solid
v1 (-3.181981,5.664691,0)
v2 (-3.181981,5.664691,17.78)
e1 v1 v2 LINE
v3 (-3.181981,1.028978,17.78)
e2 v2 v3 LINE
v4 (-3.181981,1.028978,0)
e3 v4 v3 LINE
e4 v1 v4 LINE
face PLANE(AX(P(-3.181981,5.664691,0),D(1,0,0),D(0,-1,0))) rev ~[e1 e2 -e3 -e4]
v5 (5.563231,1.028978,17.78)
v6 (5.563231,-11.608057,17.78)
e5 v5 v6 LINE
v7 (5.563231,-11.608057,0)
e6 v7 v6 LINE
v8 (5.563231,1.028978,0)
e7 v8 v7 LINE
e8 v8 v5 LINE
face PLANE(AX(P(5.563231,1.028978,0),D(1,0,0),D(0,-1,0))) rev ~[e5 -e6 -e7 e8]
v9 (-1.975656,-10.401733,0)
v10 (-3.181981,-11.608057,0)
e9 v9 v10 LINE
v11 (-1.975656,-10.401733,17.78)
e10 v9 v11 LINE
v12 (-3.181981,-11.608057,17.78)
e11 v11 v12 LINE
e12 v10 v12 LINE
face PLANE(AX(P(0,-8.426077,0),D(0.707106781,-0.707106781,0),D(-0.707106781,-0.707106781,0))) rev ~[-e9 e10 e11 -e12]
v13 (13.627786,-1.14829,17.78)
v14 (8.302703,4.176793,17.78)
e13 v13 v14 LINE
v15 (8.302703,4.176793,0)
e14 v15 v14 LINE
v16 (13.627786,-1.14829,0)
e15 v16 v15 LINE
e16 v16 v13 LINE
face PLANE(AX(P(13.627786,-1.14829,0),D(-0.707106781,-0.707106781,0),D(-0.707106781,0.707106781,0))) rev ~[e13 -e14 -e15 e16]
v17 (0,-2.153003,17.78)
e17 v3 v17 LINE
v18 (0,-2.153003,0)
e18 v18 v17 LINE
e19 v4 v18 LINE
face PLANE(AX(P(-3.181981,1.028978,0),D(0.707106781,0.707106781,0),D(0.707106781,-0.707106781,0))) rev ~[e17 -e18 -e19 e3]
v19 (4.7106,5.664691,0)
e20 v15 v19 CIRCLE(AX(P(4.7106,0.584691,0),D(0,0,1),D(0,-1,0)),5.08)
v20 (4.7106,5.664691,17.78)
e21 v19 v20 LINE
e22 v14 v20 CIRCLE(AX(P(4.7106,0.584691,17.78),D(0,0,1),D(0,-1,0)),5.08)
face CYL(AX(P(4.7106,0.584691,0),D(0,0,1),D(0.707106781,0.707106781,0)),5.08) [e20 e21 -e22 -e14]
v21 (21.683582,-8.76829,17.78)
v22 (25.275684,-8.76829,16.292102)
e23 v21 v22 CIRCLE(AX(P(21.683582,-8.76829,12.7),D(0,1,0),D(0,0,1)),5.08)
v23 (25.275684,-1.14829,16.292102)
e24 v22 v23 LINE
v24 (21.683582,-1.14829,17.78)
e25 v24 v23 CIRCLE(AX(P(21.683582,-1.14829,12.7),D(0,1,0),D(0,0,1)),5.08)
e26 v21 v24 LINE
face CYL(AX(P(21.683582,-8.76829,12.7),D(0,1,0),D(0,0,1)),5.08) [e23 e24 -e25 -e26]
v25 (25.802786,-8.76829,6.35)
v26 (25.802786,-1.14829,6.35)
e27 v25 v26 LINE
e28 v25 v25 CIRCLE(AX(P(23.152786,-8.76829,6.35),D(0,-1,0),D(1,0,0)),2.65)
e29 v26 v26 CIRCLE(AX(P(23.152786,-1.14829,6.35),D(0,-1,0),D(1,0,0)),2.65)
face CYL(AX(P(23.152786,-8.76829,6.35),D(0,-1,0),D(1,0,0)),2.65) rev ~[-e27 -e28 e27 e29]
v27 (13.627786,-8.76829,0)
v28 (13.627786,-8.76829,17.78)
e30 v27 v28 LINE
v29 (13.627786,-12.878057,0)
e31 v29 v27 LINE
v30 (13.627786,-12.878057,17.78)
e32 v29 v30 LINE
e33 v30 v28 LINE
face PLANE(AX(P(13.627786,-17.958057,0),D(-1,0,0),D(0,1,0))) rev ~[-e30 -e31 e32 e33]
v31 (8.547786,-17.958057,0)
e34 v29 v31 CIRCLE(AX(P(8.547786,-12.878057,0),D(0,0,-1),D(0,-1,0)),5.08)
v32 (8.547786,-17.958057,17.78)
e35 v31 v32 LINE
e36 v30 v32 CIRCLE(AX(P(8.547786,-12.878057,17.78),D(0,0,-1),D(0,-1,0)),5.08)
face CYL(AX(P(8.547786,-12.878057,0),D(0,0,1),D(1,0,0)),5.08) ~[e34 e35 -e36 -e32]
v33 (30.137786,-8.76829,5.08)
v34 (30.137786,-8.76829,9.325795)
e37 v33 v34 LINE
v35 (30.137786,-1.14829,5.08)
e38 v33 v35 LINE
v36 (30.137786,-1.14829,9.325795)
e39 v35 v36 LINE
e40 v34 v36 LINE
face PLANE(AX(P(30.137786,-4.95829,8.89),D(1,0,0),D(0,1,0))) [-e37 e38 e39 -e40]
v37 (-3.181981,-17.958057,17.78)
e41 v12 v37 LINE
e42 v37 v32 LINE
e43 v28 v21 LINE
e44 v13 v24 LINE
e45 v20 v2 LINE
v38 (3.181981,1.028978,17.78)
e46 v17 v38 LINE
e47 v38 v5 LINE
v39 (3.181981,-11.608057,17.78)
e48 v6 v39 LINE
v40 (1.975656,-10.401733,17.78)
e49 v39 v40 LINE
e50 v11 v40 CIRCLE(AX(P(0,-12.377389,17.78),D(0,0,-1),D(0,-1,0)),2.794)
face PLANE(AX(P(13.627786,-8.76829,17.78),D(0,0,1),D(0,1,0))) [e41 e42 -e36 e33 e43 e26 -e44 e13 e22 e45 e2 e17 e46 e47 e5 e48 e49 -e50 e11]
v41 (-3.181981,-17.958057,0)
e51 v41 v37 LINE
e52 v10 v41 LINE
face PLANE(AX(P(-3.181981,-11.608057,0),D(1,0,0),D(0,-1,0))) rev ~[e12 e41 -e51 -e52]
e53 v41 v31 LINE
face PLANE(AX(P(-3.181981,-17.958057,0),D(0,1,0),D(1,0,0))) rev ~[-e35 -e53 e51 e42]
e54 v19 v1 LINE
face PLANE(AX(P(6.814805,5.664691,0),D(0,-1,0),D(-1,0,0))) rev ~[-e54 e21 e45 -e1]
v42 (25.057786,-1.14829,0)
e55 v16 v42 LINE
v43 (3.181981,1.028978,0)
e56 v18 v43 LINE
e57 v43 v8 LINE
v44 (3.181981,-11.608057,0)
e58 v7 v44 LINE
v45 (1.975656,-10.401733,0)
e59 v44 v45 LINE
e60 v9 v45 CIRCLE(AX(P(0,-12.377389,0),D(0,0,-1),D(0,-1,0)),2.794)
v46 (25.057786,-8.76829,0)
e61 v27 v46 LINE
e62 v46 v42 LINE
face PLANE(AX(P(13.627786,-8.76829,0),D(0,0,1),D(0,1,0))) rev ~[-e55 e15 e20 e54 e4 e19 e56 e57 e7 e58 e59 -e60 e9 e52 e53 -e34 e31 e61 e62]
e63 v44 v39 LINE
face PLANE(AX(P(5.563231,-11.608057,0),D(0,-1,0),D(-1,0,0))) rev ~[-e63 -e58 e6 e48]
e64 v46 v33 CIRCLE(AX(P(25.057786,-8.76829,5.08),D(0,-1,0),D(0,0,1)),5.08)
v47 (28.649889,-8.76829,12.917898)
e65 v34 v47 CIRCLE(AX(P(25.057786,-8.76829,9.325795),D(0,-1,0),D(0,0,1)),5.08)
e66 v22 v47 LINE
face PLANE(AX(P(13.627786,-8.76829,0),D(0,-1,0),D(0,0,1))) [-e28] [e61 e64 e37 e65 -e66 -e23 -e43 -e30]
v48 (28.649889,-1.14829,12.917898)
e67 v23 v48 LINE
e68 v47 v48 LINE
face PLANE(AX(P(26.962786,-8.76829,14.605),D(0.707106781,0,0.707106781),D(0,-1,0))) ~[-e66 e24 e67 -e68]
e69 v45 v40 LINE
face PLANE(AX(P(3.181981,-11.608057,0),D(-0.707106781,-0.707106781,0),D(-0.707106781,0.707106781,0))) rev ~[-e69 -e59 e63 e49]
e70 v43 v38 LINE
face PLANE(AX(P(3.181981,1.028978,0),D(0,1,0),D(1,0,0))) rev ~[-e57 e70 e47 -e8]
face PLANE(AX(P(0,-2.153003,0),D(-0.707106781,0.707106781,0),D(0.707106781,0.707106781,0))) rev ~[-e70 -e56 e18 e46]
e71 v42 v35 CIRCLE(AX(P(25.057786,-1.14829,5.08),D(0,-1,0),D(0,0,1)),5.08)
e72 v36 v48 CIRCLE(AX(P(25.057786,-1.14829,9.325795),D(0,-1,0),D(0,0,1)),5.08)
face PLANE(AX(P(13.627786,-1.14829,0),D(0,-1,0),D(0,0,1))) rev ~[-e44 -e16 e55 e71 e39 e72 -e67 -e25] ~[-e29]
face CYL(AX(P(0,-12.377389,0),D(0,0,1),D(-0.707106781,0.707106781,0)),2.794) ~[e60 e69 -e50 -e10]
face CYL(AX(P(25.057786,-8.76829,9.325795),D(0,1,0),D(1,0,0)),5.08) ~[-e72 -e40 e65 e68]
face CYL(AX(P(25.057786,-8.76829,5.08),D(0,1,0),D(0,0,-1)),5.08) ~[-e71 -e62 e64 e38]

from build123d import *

# Parameters (mm, degrees)
F1_DEPTH = 17.78
F2_W     = 7.62
F2_H     = 17.78
F3_DEPTH = 16.51
F4_SIZE  = 6.35
F5_R     = 2.65
F6_DEPTH = 25.4
F7_R     = 2.794
F8_R     = 5.08
F9_R     = 5.08
F10_R    = 5.08
F11_R    = 5.08


# Not quite as in the source:
# - a feature names something its author has since deleted; it is built from what else it names


with BuildPart() as f1:
    # F0 (on Top) → F1 (new body)
    with BuildSketch(Plane.XY):
        Polygon((5.5632305153, 1.0289779667), (5.5632305153, -11.6080572072), (3.1819805153, -11.6080572072), (0, -8.4260766918), (-3.1819805153, -11.6080572072), (-3.1819805153, -17.9580572072), (13.6277864288, -17.9580572072), (13.6277864288, -1.148290263), (6.8148051953, 5.6646909705), (-0.4051948047, 5.6646909705), (-3.1819805153, 5.6646909705), (-3.1819805153, 1.0289779667), (0, -2.1530025487), (3.1819805153, 1.0289779667), align=None)
    extrude(amount=F1_DEPTH)

    # F2 (on face) → F3 (join)
    with BuildSketch(Plane.YZ.offset(13.6277864288)):
        with Locations((-4.958290263, 8.89)):
            Rectangle(F2_W, F2_H)
    extrude(amount=F3_DEPTH)

    # F4
    f4_edges = [f1.edges().sort_by_distance(p)[0] for p in [
        (30.137786, -4.95829, 17.78),
    ]]
    chamfer(f4_edges, length=F4_SIZE)

    # F5 (on face) → F6 (cut)
    with BuildSketch(Plane.XZ.offset(8.768290263)):
        with Locations((23.1527864288, 6.35)):
            Circle(F5_R)
    extrude(amount=-F6_DEPTH, mode=Mode.SUBTRACT)

    # F7
    f7_edges = [f1.edges().sort_by_distance(p)[0] for p in [
        (0, -8.426077, 8.89),
    ]]
    fillet(f7_edges, radius=F7_R)

    # F8
    f8_edges = [f1.edges().sort_by_distance(p)[0] for p in [
        (6.814805, 5.664691, 8.89),
    ]]
    fillet(f8_edges, radius=F8_R)

    # F9
    f9_edges = [f1.edges().sort_by_distance(p)[0] for p in [
        (30.137786, -4.95829, 0),
    ]]
    fillet(f9_edges, radius=F9_R)

    # F10
    f10_edges = [f1.edges().sort_by_distance(p)[0] for p in [
        (13.627786, -17.958057, 8.89),
    ]]
    fillet(f10_edges, radius=F10_R)

    # F11
    f11_edges = [f1.edges().sort_by_distance(p)[0] for p in [
        (30.137786, -4.95829, 11.43),
        (23.787786, -4.95829, 17.78),
    ]]
    fillet(f11_edges, radius=F11_R)


solid = f1.part
